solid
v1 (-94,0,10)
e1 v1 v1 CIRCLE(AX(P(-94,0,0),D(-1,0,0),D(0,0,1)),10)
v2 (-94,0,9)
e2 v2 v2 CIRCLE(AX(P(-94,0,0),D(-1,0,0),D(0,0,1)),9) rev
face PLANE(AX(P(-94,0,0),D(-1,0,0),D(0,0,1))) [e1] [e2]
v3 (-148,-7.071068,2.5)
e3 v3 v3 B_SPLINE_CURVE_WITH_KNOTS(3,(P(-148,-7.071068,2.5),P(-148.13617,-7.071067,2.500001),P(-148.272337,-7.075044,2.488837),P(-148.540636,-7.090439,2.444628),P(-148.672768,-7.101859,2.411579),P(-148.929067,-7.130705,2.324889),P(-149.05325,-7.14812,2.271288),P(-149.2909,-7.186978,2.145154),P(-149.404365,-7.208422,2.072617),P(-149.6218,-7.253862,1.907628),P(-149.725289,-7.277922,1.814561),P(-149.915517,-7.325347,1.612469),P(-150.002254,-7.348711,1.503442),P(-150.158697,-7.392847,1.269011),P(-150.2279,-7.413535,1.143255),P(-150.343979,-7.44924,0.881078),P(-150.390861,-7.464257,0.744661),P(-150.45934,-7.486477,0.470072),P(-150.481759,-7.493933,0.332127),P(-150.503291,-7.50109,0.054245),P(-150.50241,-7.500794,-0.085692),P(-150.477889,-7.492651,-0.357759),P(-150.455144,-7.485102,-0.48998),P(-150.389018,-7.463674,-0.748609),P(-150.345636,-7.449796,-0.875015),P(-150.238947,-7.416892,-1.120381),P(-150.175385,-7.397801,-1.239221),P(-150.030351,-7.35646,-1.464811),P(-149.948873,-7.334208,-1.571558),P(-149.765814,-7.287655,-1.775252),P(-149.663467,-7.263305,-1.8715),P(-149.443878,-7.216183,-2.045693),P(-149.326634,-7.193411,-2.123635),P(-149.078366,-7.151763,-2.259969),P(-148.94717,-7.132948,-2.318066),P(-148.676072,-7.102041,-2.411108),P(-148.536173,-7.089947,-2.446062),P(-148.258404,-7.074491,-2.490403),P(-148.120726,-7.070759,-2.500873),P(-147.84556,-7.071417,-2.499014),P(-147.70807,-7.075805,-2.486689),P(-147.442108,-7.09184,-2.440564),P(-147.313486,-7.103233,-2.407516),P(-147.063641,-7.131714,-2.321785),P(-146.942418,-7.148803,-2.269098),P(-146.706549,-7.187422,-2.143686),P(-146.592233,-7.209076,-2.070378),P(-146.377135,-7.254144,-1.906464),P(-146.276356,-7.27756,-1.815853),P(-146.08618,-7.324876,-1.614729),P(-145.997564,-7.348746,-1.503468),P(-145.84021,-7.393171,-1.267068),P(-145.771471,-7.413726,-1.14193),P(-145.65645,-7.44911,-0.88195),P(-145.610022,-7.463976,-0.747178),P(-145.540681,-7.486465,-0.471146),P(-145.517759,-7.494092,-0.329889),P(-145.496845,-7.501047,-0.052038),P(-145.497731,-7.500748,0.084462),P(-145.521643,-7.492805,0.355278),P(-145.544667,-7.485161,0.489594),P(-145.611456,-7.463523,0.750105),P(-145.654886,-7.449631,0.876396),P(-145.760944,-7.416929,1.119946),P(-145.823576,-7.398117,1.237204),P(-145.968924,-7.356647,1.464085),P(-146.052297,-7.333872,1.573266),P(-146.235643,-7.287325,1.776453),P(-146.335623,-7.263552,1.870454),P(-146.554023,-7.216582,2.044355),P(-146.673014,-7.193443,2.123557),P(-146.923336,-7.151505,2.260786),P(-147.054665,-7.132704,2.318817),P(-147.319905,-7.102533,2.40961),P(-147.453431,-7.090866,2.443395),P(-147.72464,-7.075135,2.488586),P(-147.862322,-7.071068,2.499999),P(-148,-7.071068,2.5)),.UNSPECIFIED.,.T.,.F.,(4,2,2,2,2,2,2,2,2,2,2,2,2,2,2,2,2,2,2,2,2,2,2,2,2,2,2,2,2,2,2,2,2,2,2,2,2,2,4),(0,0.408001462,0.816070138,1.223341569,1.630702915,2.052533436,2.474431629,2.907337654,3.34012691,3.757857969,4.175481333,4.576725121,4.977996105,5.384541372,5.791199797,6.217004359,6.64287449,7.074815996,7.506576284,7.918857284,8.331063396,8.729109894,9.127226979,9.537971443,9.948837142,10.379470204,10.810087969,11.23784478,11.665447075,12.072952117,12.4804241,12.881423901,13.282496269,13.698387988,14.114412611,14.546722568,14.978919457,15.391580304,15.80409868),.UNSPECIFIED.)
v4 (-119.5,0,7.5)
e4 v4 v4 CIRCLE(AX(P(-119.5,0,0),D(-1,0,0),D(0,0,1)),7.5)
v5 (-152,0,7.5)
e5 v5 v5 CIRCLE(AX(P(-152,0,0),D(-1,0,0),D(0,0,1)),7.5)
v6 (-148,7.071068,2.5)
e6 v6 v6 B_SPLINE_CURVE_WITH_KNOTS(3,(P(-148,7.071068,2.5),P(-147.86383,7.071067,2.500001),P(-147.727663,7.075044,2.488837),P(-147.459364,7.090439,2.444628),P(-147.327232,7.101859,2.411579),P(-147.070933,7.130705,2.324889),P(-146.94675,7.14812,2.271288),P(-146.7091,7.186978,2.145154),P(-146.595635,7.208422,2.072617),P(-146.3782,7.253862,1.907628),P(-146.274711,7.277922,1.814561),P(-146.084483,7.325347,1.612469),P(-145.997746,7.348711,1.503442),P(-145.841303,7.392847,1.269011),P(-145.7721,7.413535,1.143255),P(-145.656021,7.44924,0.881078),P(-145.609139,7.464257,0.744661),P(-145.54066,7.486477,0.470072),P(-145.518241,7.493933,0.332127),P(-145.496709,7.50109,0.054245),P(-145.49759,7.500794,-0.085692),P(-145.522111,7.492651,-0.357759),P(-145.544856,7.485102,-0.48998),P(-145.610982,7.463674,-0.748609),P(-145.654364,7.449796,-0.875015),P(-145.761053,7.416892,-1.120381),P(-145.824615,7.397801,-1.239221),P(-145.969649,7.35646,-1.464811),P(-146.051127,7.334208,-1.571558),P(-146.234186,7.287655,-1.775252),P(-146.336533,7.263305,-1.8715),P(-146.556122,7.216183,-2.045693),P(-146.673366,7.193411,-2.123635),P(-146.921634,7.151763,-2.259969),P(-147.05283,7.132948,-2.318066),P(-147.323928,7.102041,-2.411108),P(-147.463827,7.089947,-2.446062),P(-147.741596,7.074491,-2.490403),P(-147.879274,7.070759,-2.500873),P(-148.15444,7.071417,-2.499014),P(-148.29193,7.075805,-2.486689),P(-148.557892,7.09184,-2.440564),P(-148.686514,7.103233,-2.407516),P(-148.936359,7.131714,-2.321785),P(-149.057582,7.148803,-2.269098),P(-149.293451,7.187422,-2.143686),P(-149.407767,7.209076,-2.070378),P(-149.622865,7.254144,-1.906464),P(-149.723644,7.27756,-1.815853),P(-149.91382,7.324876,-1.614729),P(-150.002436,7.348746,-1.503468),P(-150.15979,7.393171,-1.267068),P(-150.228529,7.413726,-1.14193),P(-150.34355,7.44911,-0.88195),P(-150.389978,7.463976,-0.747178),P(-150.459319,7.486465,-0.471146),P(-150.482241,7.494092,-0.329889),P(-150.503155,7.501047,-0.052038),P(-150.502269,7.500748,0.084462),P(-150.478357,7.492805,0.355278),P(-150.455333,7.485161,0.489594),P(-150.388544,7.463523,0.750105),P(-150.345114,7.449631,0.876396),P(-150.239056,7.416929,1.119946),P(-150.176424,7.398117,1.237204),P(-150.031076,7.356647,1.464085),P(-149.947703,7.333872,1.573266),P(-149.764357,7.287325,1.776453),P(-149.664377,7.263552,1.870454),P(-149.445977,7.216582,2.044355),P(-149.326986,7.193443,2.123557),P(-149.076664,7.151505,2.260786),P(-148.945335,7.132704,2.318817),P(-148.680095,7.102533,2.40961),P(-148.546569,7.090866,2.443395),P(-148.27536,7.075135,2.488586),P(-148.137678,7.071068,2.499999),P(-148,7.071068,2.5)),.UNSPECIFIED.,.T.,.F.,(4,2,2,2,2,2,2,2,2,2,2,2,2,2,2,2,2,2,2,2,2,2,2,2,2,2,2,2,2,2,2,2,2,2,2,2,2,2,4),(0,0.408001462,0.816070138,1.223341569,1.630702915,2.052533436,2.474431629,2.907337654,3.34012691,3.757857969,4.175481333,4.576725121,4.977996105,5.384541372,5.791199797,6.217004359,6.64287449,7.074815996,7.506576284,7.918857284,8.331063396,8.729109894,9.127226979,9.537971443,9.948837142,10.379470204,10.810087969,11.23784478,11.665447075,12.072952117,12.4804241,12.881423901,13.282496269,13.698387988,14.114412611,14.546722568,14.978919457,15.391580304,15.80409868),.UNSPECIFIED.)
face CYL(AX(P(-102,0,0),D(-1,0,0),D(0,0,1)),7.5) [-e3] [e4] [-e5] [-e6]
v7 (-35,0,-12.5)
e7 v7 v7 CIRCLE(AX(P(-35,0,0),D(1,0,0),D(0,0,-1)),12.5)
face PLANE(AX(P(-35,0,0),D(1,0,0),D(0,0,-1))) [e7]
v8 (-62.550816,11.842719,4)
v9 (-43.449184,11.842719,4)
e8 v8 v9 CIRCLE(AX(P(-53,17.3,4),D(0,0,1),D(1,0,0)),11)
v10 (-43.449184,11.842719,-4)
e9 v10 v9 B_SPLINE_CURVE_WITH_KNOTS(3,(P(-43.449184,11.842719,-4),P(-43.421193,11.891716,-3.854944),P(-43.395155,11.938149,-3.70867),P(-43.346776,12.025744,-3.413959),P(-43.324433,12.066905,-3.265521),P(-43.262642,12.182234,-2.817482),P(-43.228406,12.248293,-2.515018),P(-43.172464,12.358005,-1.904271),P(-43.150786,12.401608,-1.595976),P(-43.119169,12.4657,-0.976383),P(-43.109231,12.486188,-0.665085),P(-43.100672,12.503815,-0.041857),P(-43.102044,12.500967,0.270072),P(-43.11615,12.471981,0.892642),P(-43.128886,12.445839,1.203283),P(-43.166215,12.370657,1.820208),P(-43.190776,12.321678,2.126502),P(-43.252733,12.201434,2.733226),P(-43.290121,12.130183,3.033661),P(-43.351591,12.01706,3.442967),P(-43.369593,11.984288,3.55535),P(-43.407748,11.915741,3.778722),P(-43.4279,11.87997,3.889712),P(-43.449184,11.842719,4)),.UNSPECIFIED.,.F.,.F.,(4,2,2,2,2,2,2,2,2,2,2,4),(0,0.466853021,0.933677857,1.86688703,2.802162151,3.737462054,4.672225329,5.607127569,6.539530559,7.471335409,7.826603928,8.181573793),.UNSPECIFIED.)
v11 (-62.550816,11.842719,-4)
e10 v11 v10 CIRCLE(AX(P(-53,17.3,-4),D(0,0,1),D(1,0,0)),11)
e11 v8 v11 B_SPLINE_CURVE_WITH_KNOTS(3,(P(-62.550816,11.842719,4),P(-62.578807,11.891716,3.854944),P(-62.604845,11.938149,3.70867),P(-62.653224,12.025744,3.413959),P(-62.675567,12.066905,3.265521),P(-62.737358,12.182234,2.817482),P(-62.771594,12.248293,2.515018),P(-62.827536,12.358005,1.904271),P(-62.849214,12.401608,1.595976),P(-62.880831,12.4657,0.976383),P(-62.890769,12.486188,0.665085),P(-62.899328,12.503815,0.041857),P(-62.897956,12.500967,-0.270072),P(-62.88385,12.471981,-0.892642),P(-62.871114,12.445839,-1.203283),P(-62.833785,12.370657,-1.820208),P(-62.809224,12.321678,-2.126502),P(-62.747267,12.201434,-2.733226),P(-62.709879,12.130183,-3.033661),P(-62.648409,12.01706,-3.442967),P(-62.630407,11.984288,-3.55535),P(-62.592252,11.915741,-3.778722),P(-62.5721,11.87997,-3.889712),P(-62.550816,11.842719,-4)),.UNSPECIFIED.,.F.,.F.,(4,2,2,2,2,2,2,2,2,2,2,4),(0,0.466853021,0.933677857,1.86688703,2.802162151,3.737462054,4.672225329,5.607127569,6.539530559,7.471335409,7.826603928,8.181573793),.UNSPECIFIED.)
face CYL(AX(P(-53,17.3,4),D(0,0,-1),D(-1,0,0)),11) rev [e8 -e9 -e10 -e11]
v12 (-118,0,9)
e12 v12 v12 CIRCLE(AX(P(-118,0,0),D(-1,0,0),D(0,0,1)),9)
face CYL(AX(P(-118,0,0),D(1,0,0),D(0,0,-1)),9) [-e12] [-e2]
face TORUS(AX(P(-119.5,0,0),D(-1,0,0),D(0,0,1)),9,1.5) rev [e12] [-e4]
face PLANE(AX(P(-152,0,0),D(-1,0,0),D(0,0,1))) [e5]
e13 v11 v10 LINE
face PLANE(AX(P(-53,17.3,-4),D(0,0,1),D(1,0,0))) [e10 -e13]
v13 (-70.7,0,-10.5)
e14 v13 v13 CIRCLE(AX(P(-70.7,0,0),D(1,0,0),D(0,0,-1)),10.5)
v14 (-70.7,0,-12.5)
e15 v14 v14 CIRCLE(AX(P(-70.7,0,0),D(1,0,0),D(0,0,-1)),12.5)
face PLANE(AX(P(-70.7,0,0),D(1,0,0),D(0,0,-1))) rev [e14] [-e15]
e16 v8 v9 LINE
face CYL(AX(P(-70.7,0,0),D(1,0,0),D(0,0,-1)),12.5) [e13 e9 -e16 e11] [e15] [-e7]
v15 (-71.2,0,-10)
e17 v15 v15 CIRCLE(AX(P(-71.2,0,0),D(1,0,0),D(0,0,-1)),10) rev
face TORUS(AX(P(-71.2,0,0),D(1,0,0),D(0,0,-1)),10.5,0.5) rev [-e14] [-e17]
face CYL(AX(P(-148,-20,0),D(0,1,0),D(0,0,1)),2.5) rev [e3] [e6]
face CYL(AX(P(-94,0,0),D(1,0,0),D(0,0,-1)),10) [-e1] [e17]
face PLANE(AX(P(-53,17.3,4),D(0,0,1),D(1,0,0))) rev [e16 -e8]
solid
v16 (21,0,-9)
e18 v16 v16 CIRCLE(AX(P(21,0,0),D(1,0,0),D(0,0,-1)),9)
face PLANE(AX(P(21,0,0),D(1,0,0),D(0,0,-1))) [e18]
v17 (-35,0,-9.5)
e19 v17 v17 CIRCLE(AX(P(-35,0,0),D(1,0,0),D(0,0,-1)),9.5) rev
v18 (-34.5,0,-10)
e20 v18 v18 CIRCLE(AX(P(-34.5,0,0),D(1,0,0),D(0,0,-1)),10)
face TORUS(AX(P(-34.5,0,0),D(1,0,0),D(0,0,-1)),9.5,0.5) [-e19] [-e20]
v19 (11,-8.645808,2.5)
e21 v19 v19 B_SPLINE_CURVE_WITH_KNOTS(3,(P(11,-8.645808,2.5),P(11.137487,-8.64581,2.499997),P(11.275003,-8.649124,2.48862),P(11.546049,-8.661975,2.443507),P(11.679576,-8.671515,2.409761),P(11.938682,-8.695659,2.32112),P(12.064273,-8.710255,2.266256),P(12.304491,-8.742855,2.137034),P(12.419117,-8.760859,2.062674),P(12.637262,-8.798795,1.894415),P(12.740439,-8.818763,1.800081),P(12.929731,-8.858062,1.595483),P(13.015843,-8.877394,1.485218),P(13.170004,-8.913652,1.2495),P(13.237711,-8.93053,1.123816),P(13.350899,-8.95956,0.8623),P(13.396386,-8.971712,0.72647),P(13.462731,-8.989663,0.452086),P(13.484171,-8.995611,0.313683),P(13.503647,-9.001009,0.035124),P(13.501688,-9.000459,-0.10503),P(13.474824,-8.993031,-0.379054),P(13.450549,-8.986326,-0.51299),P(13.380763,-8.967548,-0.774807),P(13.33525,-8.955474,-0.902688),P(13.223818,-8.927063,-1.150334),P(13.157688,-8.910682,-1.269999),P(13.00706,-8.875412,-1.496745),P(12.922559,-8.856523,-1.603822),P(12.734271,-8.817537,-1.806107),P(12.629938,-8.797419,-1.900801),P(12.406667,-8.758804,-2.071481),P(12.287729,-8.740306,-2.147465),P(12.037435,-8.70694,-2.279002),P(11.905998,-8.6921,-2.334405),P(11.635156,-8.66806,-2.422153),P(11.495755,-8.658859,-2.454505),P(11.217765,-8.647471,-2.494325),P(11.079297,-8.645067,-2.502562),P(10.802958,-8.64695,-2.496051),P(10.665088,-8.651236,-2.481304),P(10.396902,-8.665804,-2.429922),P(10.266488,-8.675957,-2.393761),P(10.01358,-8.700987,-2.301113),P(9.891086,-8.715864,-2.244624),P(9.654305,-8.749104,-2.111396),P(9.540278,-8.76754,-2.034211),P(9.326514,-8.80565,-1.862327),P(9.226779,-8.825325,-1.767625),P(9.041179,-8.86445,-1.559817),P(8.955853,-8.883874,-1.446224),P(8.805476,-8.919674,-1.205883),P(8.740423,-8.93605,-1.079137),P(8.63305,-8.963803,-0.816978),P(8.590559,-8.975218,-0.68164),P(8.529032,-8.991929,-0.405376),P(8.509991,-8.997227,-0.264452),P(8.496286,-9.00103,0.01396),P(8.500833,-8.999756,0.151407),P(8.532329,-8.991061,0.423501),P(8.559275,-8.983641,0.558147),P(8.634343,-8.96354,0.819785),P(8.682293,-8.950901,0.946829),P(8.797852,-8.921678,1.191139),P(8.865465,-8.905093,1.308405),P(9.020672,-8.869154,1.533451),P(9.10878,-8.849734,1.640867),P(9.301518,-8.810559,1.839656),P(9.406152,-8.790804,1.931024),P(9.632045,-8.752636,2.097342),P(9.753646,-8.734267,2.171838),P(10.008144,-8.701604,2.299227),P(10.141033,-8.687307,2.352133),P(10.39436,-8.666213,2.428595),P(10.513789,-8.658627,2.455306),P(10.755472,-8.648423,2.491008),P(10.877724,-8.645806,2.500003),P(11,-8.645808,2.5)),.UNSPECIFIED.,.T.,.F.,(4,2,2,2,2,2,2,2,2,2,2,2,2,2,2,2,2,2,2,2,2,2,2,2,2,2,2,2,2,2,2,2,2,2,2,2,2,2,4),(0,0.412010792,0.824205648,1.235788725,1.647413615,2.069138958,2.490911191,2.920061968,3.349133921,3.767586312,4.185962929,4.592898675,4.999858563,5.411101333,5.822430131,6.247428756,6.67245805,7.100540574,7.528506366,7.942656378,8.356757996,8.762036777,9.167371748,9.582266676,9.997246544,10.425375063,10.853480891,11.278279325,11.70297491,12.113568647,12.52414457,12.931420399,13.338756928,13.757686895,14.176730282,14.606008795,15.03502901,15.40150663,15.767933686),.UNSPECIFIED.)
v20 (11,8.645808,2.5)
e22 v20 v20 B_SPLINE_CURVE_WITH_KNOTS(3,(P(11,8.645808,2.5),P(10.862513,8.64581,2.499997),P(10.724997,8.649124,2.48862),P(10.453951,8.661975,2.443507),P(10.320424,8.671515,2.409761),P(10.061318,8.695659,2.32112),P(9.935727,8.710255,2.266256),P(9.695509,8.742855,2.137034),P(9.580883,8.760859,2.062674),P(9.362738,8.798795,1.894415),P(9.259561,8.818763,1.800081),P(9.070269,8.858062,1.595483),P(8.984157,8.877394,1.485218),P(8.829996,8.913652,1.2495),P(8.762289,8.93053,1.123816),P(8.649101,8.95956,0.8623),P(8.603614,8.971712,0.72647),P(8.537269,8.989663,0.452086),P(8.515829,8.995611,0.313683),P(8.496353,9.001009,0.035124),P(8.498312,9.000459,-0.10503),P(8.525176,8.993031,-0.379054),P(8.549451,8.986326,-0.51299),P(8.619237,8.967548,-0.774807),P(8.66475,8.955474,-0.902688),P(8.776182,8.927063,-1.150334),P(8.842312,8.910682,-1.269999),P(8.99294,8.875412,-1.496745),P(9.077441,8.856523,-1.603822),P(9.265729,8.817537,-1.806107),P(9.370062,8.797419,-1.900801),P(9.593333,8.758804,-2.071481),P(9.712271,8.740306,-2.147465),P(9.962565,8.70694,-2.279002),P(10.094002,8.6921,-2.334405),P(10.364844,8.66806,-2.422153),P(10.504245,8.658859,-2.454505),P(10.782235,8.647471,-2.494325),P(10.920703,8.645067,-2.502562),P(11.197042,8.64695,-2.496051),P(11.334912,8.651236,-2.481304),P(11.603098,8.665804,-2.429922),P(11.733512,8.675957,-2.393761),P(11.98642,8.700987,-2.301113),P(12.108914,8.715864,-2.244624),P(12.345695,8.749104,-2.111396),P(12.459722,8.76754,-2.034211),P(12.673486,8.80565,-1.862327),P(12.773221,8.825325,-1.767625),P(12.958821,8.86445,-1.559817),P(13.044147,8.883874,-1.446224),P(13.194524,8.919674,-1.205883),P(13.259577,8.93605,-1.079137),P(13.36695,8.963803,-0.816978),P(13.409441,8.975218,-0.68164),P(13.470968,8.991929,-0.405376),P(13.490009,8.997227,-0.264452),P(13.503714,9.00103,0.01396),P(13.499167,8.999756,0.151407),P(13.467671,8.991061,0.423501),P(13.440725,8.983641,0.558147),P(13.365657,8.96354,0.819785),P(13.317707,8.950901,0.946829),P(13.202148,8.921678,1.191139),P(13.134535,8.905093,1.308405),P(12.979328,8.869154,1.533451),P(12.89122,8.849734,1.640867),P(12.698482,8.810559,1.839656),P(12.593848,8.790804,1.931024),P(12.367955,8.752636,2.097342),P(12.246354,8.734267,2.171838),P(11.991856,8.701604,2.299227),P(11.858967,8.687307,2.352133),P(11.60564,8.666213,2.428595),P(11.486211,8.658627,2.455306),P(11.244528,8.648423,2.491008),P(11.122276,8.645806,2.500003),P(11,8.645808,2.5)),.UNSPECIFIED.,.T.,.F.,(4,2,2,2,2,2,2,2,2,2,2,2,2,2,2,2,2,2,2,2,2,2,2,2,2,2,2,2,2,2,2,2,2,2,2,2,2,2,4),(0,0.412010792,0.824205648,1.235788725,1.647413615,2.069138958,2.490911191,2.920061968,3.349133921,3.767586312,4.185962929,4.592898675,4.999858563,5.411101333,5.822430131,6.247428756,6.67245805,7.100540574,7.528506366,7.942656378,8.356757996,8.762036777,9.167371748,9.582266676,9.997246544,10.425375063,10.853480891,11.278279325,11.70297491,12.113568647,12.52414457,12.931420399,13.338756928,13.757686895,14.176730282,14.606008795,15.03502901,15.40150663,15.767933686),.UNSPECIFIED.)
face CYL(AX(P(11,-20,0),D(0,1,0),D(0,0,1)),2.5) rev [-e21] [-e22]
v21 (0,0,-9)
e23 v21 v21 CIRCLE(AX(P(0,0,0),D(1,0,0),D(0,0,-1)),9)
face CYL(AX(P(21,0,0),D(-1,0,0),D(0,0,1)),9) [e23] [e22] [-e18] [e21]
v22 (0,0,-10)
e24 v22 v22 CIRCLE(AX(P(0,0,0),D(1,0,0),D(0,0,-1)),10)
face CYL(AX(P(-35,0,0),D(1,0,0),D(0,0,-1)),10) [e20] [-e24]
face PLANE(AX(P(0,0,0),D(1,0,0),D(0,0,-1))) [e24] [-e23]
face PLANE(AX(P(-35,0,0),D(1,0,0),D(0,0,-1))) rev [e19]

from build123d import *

# Parameters (mm, degrees)
SKETCH_2_R               = 9
EXTRUDE_1_DEPTH          = 21
SKETCH_2_3_R             = 10
EXTRUDE_2_DEPTH          = 35
EXTRUDE_START            = -35
SKETCH_2_4_R             = 12.5
EXTRUDE_3_DEPTH          = 35.7
SKETCH_3_R               = 10
EXTRUDE_4_DEPTH          = 23.3
EXTRUDE_START_2          = 47.3
SKETCH_3_3_R             = 9
EXTRUDE_5_DEPTH          = 34
EXTRUDE_6_DEPTH          = 34
EXTRUDE_6_DEPTH_BACK     = 16
EXTRUDE_6_START          = 47.3
SKETCH_3_4_R             = 7.5
FILLET_1_R               = 1.5
FILLET_2_R               = 0.5
FILLET_3_R               = 0.5
SKETCH_4_R               = 2.5
CUT_EXTRUDE_1_DEPTH      = 34
CUT_EXTRUDE_2_DEPTH      = 4
CUT_EXTRUDE_2_DEPTH_BACK = 4
SKETCH_5_R               = 11


with BuildPart() as part:
    # 스케치2 → 보스-돌출1 (new body)
    with BuildSketch(Plane(origin=(0, 0, 0), x_dir=(0, 0, -1), z_dir=(1, 0, 0))):
        with Locations(Location((0, 0, 0), (0, 0, 180))):
            Circle(SKETCH_2_R)
    extrude(amount=EXTRUDE_1_DEPTH)

    # 스케치2<3> → 보스-돌출2 (add)
    with BuildSketch(Plane(origin=(0, 0, 0), x_dir=(0, 0, -1), z_dir=(1, 0, 0))):
        Circle(SKETCH_2_3_R)
    extrude(amount=-EXTRUDE_2_DEPTH)

    # 필렛3
    fillet_3_edges = [part.edges().sort_by_distance(p)[0] for p in [
        (-35, 0, 10),
    ]]
    fillet(fillet_3_edges, radius=FILLET_3_R)


with BuildPart() as body_2:
    # 스케치2<4> → 보스-돌출3 (new body)
    with BuildSketch(Plane(origin=(0, 0, 0), x_dir=(0, 0, -1), z_dir=(1, 0, 0)).offset(EXTRUDE_START)):
        Circle(SKETCH_2_4_R)
    extrude(amount=-EXTRUDE_3_DEPTH)

    # 스케치3 → 보스-돌출4 (add)
    with BuildSketch(Plane.ZY.offset(70.7)):
        Circle(SKETCH_3_R)
    extrude(amount=EXTRUDE_4_DEPTH)

    # 스케치3<3> → 보스-돌출5 (add)
    with BuildSketch(Plane.ZY.offset(70.7).offset(EXTRUDE_START_2)):
        Circle(SKETCH_3_3_R)
    extrude(amount=-EXTRUDE_5_DEPTH)

    # 스케치3<4> → 보스-돌출6 (add, two sides: drawn at the far end of the back side and taken through both)
    with BuildSketch(Plane.ZY.offset(70.7).offset(EXTRUDE_6_START - EXTRUDE_6_DEPTH_BACK)):
        Circle(SKETCH_3_4_R)
    extrude(amount=EXTRUDE_6_DEPTH + EXTRUDE_6_DEPTH_BACK)

    # 필렛1
    fillet_1_edges = [body_2.edges().sort_by_distance(p)[0] for p in [
        (-118, 0, -7.5),
    ]]
    fillet(fillet_1_edges, radius=FILLET_1_R - 0.0001)  # a hair under: the kernel refuses the full size

    # 필렛2
    fillet_2_edges = [body_2.edges().sort_by_distance(p)[0] for p in [
        (-70.7, 0, -10),
    ]]
    fillet(fillet_2_edges, radius=FILLET_2_R)


with BuildPart() as cut_extrude_1_tool:
    # 스케치4 → 컷-돌출1 (new body)
    with BuildSketch(Plane(origin=(0, 14, 0), x_dir=(1, 0, 0), z_dir=(0, 1, 0))):
        with Locations(Location((-148, 0, 0), (0, 0, 270))):
            Circle(SKETCH_4_R)
        with Locations(Location((11, 0, 0), (0, 0, 270))):
            Circle(SKETCH_4_R)
    extrude(amount=-CUT_EXTRUDE_1_DEPTH)


with BuildPart() as part_1:
    add(part.part)

    # 컷-돌출1: cut by cut_extrude_1_tool
    add(cut_extrude_1_tool.part, mode=Mode.SUBTRACT)


with BuildPart() as body_2_1:
    add(body_2.part)

    # 컷-돌출1: cut by cut_extrude_1_tool
    add(cut_extrude_1_tool.part, mode=Mode.SUBTRACT)

    # 스케치5 → 컷-돌출2 (cut, two sides: drawn at the far end of the back side and taken through both)
    with BuildSketch(Plane.XY.offset(-CUT_EXTRUDE_2_DEPTH_BACK)):
        with Locations((-53, 17.3)):
            Circle(SKETCH_5_R)
    extrude(amount=CUT_EXTRUDE_2_DEPTH + CUT_EXTRUDE_2_DEPTH_BACK, mode=Mode.SUBTRACT)


solid = Compound([part_1.part, body_2_1.part])
